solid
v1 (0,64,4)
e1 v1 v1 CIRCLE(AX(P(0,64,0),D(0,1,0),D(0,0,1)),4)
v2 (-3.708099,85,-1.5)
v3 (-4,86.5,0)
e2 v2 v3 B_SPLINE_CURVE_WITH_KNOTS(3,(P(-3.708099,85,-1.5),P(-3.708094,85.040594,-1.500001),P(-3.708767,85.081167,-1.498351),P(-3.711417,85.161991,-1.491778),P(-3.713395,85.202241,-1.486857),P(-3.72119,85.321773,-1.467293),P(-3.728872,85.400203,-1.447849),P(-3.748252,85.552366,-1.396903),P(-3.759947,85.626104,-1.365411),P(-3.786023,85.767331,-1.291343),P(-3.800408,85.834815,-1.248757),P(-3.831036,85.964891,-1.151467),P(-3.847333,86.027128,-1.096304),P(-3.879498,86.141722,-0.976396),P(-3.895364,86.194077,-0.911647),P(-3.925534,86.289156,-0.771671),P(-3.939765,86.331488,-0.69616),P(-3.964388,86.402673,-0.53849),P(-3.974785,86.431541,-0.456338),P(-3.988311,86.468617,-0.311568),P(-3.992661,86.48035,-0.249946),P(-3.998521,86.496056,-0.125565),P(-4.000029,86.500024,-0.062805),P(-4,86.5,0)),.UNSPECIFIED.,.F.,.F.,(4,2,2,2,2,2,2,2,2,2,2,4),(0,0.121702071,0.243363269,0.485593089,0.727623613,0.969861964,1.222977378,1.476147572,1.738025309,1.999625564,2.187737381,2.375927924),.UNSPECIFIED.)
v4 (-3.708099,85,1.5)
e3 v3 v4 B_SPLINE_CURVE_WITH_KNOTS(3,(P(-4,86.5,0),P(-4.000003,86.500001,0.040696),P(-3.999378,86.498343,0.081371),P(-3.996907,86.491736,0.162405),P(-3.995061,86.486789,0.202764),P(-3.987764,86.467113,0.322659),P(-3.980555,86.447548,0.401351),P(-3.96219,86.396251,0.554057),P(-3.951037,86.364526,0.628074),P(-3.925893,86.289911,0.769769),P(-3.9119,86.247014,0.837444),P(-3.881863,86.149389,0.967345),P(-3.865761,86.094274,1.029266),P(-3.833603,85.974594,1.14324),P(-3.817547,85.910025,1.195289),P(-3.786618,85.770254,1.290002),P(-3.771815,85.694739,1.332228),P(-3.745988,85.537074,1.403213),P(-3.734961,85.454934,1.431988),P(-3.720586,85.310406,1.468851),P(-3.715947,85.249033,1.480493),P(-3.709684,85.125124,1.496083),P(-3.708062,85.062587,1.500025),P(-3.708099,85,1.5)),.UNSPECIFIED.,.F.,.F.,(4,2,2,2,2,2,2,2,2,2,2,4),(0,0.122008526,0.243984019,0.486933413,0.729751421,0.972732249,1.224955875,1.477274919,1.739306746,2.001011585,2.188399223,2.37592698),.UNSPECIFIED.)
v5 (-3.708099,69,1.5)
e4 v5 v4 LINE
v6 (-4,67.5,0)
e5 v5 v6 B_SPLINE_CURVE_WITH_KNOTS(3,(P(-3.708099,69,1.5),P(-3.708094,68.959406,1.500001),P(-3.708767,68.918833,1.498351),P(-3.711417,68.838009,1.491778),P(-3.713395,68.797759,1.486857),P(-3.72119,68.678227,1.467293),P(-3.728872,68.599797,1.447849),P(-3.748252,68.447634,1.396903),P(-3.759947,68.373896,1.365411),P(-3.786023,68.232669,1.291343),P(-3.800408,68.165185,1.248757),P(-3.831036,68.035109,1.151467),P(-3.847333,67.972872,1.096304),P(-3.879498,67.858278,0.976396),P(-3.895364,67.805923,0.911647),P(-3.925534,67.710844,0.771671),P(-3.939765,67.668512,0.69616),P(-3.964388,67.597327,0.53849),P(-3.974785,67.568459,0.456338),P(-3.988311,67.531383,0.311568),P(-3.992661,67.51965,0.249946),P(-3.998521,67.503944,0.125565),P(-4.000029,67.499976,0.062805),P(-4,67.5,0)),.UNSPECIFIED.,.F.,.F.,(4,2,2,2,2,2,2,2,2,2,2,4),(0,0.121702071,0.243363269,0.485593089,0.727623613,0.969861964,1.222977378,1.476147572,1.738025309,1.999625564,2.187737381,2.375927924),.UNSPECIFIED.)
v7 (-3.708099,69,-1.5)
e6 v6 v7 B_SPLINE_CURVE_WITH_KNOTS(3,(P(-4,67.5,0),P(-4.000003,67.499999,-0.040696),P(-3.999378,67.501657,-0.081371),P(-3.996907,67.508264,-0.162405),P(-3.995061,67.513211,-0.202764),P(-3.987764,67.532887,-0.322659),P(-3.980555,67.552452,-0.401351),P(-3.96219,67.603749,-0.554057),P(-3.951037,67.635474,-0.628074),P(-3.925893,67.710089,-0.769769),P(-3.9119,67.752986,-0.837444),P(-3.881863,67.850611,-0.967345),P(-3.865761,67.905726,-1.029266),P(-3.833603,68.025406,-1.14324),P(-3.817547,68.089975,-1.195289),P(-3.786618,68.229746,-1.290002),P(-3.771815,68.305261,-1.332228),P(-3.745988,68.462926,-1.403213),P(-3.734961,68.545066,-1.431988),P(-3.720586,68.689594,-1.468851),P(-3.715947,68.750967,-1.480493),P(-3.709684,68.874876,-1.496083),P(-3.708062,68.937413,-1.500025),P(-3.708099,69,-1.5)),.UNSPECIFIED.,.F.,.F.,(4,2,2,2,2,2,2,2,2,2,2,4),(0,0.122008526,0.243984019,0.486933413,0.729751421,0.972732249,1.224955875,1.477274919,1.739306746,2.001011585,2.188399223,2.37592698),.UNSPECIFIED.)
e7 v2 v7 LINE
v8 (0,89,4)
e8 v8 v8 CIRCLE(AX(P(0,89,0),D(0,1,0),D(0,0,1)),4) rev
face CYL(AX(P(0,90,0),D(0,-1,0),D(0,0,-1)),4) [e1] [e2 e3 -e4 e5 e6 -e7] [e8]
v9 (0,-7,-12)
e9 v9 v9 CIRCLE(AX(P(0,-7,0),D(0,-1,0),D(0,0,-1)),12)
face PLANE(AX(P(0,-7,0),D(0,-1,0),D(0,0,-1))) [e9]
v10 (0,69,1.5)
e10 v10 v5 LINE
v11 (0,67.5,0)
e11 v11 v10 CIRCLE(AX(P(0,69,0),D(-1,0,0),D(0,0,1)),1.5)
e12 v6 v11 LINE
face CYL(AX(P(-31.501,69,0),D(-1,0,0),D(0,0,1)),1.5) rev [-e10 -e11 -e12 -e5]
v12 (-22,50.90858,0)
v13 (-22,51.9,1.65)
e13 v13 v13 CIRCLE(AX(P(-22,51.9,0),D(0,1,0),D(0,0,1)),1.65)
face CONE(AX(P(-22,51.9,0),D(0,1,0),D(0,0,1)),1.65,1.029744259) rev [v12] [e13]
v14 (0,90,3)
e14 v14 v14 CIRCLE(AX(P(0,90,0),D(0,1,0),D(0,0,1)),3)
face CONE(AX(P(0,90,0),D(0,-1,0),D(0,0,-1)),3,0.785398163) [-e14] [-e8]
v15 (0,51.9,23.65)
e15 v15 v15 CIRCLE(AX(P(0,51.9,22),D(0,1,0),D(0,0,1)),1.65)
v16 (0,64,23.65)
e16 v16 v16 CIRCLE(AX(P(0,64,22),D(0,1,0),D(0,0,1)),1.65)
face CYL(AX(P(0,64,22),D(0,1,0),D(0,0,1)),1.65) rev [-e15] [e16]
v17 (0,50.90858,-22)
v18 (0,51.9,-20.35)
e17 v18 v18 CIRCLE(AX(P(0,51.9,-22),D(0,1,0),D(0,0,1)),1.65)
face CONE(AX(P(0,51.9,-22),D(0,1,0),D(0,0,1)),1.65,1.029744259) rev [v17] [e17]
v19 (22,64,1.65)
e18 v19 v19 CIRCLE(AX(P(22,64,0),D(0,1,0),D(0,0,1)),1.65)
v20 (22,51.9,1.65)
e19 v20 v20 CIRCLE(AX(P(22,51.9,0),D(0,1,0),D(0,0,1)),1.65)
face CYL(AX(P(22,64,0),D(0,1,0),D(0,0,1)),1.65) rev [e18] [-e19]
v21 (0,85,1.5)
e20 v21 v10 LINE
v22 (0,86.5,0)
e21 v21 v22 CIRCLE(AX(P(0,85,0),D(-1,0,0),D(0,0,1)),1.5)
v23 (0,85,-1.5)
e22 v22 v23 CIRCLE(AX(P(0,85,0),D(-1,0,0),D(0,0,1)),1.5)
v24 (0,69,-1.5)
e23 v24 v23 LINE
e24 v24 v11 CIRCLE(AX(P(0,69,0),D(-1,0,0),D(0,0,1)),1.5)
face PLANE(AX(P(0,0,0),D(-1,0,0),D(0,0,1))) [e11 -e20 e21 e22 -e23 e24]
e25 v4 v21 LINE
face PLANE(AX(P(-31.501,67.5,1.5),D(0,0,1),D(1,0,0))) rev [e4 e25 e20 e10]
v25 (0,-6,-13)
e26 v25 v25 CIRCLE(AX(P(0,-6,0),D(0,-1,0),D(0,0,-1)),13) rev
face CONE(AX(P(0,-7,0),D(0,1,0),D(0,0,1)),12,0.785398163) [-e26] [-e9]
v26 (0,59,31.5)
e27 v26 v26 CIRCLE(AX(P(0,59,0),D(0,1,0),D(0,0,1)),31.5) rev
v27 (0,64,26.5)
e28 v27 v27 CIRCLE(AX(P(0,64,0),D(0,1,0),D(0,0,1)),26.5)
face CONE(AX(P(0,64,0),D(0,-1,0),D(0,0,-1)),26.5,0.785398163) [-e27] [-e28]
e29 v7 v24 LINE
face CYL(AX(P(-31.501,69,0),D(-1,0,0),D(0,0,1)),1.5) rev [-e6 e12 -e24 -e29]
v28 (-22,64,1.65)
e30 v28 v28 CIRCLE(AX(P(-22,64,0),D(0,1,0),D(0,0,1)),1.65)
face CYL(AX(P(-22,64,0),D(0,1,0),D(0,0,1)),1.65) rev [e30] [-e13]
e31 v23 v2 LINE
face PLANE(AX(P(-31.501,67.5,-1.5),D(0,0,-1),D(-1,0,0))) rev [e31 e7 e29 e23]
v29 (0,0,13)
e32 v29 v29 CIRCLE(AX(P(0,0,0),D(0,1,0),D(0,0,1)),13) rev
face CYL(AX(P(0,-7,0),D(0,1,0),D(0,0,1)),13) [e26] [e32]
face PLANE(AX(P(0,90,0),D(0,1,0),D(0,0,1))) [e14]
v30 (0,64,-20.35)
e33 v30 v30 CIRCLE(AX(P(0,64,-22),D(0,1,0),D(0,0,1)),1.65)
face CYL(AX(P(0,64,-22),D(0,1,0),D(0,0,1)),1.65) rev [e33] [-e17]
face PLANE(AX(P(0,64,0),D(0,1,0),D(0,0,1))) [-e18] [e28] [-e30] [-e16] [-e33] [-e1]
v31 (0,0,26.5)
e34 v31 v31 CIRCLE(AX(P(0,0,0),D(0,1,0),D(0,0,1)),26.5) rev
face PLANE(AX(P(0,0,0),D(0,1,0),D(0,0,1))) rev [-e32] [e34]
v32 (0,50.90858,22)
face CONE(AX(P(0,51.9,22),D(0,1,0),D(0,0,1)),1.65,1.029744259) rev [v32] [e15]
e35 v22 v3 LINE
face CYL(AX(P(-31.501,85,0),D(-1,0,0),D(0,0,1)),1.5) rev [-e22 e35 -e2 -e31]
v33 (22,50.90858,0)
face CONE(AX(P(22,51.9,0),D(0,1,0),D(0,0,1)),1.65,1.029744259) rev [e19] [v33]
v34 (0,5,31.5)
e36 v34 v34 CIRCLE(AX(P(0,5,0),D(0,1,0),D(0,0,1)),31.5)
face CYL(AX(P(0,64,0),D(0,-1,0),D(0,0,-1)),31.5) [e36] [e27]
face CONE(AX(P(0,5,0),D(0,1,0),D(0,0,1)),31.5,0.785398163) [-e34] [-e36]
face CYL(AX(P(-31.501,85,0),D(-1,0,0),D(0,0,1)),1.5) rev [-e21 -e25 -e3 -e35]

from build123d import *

# Parameters (mm, degrees)
SKETCH1_R               = 31.5
BOSS_EXTRUDE1_DEPTH     = 64
SKETCH2_R               = 4
BOSS_EXTRUDE2_DEPTH     = 26
CHAMFER3_SIZE           = 1
CUT_EXTRUDE1_REACH      = 102.422
CUT_EXTRUDE1_END_RADIUS = 4
SKETCH3_W               = 3
SKETCH3_H               = 19
FILLET1_R               = 1.5
CIRPATTERN2_COUNT       = 4
CHAMFER4_SIZE           = 5
SKETCH11_R              = 13
BOSS_EXTRUDE3_DEPTH     = 7
CHAMFER5_SIZE           = 1


with BuildPart() as part:
    # Sketch1 → Boss-Extrude1 (new body)
    with BuildSketch(Plane(origin=(0, 0, 0), x_dir=(1, 0, 0), z_dir=(0, 1, 0))):
        with Locations(Location((0, 0, 0), (0, 0, 270))):
            Circle(SKETCH1_R)
    extrude(amount=BOSS_EXTRUDE1_DEPTH)

    # Sketch2 → Boss-Extrude2 (add)
    with BuildSketch(Plane(origin=(0, 64, 0), x_dir=(1, 0, 0), z_dir=(0, 1, 0))):
        with Locations(Location((0, 0, 0), (0, 0, 90))):
            Circle(SKETCH2_R)
    extrude(amount=BOSS_EXTRUDE2_DEPTH)

    # Chamfer3
    chamfer3_edges = [part.edges().sort_by_distance(p)[0] for p in [
        (0, 90, 4),
    ]]
    chamfer(chamfer3_edges, length=CHAMFER3_SIZE)

    # Cut-Extrude1: up to this cylinder (the profile starts inside it)
    cut_extrude1_end = Plane(origin=(0, 77, 0), z_dir=(0, -1, 0)) * Cylinder(CUT_EXTRUDE1_END_RADIUS, 213.844, mode=Mode.PRIVATE)
    # Sketch3 → Cut-Extrude1 (cut, up to the surface)
    with BuildSketch(Plane(origin=(0, 0, 0), x_dir=(0, 0, -1), z_dir=(1, 0, 0)), mode=Mode.PRIVATE) as cut_extrude1_sk1:
        with Locations((0, 77)):
            Rectangle(SKETCH3_W, SKETCH3_H)
    cut_extrude1_tool1 = extrude(cut_extrude1_sk1.sketch, amount=-CUT_EXTRUDE1_REACH, mode=Mode.PRIVATE) & cut_extrude1_end
    add(cut_extrude1_tool1.solids().sort_by_distance((0, 77, 0))[0], mode=Mode.SUBTRACT)

    # Fillet1
    fillet1_edges = [part.edges().sort_by_distance(p)[0] for p in [
        (-1.854049622, 67.5, -1.5),
        (-1.854049622, 67.5, 1.5),
        (-1.854049622, 86.5, -1.5),
        (-1.854049622, 86.5, 1.5),
    ]]
    fillet(fillet1_edges, radius=FILLET1_R - 0.0001)  # a hair under: the kernel refuses the full size

    # Sketch10 → M4 Tapped Hole1 (revolve, cut)
    with BuildSketch(Plane(origin=(0, 64, -22), x_dir=(0, 0, 1), z_dir=(1, 0, 0))):
        Polygon((0, 0), (0, 13.091420021), (1.65, 12.1), (1.65, 0), align=None)
    m4_tapped_hole1 = revolve(axis=Axis((0, 70.35, -22), (0, -1, 0)), mode=Mode.SUBTRACT)

    # CirPattern2: M4 Tapped Hole1 ×4 about axis
    cirpattern2_axis = Axis((0, 0, 0), (0, 1, 0))
    for i in range(1, CIRPATTERN2_COUNT):
        add(m4_tapped_hole1.rotate(cirpattern2_axis, i * 360 / CIRPATTERN2_COUNT), mode=Mode.SUBTRACT)

    # Chamfer4
    chamfer4_edges = [part.edges().sort_by_distance(p)[0] for p in [
        (0, 0, -31.5),
        (0, 64, -31.5),
    ]]
    chamfer(chamfer4_edges, length=CHAMFER4_SIZE)

    # Sketch11 → Boss-Extrude3 (add)
    with BuildSketch(Plane(origin=(0, 0, 0), x_dir=(-1, 0, 0), z_dir=(0, -1, 0))):
        with Locations(Location((0, 0, 0), (0, 0, 270))):
            Circle(SKETCH11_R)
    extrude(amount=BOSS_EXTRUDE3_DEPTH)

    # Chamfer5
    chamfer5_edges = [part.edges().sort_by_distance(p)[0] for p in [
        (0, -7, -13),
    ]]
    chamfer(chamfer5_edges, length=CHAMFER5_SIZE)


solid = part.part
